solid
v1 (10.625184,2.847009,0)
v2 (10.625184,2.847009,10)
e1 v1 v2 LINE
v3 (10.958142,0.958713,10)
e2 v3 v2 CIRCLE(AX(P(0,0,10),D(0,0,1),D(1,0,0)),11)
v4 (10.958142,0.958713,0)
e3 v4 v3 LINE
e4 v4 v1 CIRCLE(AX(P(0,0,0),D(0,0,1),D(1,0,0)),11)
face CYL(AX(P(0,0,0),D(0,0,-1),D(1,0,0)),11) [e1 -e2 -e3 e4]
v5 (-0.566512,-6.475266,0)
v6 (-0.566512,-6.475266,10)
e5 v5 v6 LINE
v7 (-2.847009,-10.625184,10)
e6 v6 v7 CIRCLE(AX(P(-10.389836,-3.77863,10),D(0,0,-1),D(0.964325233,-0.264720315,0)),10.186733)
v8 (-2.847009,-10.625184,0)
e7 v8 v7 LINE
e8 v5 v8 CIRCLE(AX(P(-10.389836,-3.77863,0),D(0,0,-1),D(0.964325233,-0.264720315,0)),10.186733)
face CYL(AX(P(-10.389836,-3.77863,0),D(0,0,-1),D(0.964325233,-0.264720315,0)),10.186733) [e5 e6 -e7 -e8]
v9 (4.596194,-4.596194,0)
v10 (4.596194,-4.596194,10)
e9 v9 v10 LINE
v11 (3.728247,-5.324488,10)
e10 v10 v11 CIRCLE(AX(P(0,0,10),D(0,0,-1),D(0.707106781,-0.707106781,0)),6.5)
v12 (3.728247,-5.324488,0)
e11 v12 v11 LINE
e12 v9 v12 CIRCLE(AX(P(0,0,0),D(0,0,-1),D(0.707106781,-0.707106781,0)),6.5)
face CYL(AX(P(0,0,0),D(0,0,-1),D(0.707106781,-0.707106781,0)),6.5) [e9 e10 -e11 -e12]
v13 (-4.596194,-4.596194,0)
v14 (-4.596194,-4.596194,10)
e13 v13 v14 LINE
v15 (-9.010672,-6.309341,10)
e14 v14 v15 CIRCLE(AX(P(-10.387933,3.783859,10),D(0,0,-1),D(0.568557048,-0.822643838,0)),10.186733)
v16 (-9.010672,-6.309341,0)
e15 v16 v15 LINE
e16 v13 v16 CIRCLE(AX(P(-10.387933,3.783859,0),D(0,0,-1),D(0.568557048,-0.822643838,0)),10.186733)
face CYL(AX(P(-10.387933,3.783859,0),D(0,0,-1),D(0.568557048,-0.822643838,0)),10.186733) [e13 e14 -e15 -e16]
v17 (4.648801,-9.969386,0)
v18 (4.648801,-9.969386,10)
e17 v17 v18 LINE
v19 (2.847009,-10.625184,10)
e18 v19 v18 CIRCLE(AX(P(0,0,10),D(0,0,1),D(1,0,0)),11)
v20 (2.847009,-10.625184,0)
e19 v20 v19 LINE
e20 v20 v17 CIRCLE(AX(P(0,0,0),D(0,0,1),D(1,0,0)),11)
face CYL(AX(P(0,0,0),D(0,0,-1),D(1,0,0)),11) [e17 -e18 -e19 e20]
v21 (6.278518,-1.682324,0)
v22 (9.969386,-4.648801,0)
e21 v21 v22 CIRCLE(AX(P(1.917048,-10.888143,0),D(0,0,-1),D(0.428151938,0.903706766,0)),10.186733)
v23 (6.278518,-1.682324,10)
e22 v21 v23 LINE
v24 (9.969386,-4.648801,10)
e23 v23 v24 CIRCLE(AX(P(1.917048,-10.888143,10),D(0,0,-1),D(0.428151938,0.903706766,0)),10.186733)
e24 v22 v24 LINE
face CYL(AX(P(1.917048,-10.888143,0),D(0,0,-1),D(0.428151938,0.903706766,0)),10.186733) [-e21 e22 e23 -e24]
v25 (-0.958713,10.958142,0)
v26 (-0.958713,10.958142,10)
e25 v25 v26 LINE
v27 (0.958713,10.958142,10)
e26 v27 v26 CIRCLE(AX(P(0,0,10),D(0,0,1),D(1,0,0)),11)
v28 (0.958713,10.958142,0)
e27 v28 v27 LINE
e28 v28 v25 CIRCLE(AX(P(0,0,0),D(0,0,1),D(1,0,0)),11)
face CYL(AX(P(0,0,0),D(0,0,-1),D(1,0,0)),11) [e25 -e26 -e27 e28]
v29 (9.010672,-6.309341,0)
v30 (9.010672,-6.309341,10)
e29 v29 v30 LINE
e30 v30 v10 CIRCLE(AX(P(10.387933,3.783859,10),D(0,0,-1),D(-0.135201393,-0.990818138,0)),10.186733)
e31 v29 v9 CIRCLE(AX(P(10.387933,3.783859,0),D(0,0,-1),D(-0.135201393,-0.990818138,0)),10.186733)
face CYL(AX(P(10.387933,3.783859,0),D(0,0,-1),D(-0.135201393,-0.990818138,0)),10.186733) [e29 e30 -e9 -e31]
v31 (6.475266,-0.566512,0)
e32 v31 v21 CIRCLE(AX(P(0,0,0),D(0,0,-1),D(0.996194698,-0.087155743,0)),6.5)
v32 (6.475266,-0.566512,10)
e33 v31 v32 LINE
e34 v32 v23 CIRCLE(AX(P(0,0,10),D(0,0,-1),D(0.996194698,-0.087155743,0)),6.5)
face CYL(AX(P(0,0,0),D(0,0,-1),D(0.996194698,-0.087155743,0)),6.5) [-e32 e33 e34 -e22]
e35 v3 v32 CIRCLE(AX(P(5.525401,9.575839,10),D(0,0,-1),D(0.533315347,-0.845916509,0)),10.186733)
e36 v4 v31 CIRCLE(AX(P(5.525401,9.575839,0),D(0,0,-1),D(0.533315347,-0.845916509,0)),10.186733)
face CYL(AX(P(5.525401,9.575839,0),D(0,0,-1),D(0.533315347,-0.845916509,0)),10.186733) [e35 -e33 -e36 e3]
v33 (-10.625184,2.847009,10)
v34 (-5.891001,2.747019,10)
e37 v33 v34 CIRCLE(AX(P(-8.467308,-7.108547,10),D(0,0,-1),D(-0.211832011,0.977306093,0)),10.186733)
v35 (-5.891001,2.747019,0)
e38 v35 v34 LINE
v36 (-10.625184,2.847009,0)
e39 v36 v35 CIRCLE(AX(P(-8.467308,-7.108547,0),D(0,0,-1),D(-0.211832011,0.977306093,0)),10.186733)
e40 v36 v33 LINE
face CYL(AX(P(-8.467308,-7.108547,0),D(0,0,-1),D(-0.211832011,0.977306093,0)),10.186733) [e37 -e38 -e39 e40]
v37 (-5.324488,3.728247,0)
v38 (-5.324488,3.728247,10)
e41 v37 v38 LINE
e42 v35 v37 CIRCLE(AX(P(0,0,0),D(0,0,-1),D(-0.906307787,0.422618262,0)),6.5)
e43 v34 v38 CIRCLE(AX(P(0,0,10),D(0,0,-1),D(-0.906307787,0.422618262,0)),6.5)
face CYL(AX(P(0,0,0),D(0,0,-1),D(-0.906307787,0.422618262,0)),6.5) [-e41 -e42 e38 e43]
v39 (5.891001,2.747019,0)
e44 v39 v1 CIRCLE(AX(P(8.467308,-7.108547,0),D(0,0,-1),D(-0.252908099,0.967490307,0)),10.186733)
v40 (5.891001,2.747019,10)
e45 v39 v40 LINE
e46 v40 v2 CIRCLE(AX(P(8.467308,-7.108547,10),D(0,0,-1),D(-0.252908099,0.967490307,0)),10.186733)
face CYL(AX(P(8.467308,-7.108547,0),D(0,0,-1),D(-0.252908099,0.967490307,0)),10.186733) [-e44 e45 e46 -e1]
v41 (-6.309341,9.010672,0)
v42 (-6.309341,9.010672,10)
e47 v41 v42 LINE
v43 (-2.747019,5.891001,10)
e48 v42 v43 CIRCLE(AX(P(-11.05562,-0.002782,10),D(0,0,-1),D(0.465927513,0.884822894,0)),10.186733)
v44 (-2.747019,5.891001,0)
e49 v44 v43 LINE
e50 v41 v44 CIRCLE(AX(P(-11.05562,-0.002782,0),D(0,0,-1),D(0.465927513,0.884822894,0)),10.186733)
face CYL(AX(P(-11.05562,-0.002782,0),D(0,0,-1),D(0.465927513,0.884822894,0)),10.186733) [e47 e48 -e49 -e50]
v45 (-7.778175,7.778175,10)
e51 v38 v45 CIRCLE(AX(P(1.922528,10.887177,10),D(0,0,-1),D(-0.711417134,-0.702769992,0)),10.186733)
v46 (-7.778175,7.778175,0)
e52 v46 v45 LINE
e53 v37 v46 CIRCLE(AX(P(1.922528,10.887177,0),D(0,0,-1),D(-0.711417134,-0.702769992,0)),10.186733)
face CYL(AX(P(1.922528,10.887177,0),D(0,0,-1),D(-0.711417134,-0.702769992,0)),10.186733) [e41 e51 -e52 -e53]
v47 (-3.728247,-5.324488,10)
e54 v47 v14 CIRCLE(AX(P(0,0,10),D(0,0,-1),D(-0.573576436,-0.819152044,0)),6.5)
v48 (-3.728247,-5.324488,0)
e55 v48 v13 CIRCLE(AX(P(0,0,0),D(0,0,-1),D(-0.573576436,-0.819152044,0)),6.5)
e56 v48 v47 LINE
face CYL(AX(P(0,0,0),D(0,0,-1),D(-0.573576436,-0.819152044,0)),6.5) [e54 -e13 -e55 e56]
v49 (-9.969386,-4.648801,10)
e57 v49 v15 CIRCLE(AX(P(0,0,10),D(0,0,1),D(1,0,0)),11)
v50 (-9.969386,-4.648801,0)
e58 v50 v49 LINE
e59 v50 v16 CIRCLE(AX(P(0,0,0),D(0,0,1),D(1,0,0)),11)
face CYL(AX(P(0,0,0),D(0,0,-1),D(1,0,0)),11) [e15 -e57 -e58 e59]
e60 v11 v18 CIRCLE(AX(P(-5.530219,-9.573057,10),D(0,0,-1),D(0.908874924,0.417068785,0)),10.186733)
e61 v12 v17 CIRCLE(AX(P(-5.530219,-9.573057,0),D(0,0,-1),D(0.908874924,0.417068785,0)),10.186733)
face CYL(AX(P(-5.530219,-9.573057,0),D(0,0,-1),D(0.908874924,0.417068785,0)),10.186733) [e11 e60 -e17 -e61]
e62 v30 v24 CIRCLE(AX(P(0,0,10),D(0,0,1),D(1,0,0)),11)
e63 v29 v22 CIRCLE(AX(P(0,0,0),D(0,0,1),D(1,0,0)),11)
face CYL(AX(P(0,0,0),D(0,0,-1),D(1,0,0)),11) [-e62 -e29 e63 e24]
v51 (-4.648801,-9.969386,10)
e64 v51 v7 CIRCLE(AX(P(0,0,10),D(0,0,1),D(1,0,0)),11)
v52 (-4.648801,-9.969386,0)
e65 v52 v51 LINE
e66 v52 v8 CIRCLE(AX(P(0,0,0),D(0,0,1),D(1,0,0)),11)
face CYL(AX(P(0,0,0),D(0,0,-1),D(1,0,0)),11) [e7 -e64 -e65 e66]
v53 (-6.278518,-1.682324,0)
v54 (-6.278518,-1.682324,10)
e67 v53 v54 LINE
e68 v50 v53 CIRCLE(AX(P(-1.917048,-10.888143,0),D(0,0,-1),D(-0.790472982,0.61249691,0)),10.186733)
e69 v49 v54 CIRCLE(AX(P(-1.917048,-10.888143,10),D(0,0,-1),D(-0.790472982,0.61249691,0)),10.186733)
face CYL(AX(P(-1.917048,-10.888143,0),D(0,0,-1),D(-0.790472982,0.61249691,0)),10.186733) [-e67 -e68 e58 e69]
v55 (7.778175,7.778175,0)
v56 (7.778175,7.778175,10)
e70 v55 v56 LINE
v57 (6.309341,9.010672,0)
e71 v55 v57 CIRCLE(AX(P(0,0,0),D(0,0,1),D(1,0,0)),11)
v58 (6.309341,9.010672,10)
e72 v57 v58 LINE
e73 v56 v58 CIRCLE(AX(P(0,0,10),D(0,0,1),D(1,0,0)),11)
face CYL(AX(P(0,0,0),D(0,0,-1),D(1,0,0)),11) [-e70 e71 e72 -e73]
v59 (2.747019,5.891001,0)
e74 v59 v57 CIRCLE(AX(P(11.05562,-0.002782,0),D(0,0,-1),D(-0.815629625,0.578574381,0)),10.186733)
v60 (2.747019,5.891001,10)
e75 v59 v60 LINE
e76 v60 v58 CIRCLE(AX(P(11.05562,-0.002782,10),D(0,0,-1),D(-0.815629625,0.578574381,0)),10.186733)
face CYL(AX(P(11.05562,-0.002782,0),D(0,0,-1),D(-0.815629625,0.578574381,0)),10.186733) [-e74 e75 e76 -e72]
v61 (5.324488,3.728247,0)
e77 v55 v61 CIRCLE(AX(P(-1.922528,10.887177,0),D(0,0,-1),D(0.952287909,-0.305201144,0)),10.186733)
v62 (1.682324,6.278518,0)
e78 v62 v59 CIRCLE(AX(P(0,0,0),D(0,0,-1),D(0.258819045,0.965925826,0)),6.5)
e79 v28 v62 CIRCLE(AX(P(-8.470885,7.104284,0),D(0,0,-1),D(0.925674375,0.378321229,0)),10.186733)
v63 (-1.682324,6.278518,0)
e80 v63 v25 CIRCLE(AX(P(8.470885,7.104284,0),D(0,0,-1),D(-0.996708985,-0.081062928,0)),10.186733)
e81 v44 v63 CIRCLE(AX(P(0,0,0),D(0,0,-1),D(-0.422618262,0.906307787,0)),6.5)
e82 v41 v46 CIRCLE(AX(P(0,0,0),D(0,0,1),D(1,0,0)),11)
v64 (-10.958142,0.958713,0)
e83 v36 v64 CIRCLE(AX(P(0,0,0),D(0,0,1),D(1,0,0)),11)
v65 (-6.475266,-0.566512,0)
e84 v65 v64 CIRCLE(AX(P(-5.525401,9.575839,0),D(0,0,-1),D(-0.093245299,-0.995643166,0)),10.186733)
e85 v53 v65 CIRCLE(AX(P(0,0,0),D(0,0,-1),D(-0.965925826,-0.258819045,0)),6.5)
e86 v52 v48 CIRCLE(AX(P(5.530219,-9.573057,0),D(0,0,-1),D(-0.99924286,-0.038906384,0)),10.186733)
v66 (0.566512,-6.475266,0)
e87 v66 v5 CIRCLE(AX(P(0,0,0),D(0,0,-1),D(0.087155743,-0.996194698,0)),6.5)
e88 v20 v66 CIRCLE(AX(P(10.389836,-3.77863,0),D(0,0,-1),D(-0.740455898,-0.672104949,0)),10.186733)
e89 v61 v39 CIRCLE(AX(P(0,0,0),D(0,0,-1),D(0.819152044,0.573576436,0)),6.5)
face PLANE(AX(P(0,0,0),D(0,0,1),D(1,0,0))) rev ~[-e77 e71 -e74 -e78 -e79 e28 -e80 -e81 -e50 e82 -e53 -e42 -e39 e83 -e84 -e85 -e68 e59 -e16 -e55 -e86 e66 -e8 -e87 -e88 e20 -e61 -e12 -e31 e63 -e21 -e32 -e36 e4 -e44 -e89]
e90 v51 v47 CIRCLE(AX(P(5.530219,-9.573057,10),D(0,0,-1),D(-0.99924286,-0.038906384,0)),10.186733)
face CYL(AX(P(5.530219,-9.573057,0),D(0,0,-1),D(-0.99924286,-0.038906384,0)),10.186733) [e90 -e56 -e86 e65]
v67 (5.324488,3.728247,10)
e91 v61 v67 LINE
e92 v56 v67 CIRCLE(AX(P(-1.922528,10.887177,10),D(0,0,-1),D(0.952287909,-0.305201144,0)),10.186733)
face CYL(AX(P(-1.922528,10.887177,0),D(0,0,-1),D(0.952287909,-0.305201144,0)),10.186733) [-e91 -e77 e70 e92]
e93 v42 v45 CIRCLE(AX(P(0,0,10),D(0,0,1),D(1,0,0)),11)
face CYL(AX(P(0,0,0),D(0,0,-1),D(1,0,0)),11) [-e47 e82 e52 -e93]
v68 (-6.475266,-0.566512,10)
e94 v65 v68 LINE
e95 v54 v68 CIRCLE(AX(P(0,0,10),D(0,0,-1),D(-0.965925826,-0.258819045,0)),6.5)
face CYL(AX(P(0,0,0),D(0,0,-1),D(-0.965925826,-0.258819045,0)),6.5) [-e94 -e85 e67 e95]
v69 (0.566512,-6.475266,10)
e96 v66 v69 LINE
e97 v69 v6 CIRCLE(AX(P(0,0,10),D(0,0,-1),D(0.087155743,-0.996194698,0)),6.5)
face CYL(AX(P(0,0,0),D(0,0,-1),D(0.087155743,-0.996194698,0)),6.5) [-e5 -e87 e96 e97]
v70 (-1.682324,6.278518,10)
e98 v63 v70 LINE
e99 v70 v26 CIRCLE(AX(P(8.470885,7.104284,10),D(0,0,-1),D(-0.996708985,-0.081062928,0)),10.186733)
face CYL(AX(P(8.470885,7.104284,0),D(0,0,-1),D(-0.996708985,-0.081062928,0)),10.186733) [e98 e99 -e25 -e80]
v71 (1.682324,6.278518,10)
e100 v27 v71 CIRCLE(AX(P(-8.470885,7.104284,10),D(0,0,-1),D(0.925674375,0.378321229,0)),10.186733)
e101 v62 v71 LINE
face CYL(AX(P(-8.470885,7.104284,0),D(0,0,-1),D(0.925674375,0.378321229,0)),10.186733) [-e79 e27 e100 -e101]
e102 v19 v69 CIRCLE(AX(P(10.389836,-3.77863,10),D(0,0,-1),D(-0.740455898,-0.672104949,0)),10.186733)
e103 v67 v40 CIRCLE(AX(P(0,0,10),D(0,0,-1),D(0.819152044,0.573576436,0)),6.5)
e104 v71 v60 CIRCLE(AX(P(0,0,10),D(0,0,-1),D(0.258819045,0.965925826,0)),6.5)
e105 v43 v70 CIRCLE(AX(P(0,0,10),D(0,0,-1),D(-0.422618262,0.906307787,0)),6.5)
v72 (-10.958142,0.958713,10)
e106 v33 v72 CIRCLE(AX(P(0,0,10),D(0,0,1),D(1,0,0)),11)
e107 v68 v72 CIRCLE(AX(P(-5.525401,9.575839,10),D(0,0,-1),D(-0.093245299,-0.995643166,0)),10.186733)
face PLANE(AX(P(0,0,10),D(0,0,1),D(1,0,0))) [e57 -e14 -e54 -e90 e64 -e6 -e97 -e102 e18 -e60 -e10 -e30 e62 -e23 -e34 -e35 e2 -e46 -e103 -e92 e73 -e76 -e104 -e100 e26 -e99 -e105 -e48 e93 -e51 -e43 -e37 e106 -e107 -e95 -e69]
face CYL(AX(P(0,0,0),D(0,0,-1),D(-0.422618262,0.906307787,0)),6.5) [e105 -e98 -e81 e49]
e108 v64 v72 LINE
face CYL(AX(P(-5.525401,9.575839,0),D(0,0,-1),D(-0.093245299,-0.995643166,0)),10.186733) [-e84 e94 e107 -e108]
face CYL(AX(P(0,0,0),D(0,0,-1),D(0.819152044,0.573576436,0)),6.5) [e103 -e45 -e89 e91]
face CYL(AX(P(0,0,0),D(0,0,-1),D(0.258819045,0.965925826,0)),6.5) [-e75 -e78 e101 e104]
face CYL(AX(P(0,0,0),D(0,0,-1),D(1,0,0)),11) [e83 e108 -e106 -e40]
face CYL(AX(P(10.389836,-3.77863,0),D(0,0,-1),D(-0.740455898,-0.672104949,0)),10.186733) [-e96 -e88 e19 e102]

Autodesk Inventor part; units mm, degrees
sketch "Sketch1" plane through (0, 0, 0) normal (0, 0, 1) x (1, 0, 0)
  circle A0 centre (0, 0) radius 11
  dimension "d0" = 22
extrude "Extrusion1" add sketch "Sketch1" along normal blind 10
ref_plane "Work Plane2" through (0, 0, 5) normal (0, 0, 1) x (1, 0, 0)
sketch "Sketch2" plane through (0, 0, 0) normal (0, 0, -1) x (-1, 0, 0)
  circle A0 centre (0, 0) radius 11 projected
  circle A1 centre (0, 0) radius 9
  dimension "d3" = 18
surface extrude "Pitch Diameter" sketch "Sketch2" against normal through all shown no curves A1
ref_plane "Work Plane8" through (0, 0, 0) normal (0.9396926, 0.3420201, 0) x (0, 0, 1)
ref_plane "Work Plane9" through (0, 0, 0) normal (1, 0, 0) x (0, 1, 0)
spur gear teeth "Spur Gear" teeth 9 pitch diameter 18 tip diameter 22 root diameter 13 face width 10 start plane through (0, 0, 0) normal (0, 0, -1) x (-1, 0, 0)
equation "\"d0\" = da_da"
equation "\"d1\" = da_b"
equation "\"d3\" = da_dw"
equation "\"d16\" = da_aw"
equation "\"d43\" = da_aw"
equation "\"d46\" = da_aw"
equation "\"da_da\" = 22"
equation "\"da_b\" = 10"
equation "\"da_dw\" = 18"
equation "\"da_aw\" = 28"
properties part number "Spur Gear2" material "Steel"
